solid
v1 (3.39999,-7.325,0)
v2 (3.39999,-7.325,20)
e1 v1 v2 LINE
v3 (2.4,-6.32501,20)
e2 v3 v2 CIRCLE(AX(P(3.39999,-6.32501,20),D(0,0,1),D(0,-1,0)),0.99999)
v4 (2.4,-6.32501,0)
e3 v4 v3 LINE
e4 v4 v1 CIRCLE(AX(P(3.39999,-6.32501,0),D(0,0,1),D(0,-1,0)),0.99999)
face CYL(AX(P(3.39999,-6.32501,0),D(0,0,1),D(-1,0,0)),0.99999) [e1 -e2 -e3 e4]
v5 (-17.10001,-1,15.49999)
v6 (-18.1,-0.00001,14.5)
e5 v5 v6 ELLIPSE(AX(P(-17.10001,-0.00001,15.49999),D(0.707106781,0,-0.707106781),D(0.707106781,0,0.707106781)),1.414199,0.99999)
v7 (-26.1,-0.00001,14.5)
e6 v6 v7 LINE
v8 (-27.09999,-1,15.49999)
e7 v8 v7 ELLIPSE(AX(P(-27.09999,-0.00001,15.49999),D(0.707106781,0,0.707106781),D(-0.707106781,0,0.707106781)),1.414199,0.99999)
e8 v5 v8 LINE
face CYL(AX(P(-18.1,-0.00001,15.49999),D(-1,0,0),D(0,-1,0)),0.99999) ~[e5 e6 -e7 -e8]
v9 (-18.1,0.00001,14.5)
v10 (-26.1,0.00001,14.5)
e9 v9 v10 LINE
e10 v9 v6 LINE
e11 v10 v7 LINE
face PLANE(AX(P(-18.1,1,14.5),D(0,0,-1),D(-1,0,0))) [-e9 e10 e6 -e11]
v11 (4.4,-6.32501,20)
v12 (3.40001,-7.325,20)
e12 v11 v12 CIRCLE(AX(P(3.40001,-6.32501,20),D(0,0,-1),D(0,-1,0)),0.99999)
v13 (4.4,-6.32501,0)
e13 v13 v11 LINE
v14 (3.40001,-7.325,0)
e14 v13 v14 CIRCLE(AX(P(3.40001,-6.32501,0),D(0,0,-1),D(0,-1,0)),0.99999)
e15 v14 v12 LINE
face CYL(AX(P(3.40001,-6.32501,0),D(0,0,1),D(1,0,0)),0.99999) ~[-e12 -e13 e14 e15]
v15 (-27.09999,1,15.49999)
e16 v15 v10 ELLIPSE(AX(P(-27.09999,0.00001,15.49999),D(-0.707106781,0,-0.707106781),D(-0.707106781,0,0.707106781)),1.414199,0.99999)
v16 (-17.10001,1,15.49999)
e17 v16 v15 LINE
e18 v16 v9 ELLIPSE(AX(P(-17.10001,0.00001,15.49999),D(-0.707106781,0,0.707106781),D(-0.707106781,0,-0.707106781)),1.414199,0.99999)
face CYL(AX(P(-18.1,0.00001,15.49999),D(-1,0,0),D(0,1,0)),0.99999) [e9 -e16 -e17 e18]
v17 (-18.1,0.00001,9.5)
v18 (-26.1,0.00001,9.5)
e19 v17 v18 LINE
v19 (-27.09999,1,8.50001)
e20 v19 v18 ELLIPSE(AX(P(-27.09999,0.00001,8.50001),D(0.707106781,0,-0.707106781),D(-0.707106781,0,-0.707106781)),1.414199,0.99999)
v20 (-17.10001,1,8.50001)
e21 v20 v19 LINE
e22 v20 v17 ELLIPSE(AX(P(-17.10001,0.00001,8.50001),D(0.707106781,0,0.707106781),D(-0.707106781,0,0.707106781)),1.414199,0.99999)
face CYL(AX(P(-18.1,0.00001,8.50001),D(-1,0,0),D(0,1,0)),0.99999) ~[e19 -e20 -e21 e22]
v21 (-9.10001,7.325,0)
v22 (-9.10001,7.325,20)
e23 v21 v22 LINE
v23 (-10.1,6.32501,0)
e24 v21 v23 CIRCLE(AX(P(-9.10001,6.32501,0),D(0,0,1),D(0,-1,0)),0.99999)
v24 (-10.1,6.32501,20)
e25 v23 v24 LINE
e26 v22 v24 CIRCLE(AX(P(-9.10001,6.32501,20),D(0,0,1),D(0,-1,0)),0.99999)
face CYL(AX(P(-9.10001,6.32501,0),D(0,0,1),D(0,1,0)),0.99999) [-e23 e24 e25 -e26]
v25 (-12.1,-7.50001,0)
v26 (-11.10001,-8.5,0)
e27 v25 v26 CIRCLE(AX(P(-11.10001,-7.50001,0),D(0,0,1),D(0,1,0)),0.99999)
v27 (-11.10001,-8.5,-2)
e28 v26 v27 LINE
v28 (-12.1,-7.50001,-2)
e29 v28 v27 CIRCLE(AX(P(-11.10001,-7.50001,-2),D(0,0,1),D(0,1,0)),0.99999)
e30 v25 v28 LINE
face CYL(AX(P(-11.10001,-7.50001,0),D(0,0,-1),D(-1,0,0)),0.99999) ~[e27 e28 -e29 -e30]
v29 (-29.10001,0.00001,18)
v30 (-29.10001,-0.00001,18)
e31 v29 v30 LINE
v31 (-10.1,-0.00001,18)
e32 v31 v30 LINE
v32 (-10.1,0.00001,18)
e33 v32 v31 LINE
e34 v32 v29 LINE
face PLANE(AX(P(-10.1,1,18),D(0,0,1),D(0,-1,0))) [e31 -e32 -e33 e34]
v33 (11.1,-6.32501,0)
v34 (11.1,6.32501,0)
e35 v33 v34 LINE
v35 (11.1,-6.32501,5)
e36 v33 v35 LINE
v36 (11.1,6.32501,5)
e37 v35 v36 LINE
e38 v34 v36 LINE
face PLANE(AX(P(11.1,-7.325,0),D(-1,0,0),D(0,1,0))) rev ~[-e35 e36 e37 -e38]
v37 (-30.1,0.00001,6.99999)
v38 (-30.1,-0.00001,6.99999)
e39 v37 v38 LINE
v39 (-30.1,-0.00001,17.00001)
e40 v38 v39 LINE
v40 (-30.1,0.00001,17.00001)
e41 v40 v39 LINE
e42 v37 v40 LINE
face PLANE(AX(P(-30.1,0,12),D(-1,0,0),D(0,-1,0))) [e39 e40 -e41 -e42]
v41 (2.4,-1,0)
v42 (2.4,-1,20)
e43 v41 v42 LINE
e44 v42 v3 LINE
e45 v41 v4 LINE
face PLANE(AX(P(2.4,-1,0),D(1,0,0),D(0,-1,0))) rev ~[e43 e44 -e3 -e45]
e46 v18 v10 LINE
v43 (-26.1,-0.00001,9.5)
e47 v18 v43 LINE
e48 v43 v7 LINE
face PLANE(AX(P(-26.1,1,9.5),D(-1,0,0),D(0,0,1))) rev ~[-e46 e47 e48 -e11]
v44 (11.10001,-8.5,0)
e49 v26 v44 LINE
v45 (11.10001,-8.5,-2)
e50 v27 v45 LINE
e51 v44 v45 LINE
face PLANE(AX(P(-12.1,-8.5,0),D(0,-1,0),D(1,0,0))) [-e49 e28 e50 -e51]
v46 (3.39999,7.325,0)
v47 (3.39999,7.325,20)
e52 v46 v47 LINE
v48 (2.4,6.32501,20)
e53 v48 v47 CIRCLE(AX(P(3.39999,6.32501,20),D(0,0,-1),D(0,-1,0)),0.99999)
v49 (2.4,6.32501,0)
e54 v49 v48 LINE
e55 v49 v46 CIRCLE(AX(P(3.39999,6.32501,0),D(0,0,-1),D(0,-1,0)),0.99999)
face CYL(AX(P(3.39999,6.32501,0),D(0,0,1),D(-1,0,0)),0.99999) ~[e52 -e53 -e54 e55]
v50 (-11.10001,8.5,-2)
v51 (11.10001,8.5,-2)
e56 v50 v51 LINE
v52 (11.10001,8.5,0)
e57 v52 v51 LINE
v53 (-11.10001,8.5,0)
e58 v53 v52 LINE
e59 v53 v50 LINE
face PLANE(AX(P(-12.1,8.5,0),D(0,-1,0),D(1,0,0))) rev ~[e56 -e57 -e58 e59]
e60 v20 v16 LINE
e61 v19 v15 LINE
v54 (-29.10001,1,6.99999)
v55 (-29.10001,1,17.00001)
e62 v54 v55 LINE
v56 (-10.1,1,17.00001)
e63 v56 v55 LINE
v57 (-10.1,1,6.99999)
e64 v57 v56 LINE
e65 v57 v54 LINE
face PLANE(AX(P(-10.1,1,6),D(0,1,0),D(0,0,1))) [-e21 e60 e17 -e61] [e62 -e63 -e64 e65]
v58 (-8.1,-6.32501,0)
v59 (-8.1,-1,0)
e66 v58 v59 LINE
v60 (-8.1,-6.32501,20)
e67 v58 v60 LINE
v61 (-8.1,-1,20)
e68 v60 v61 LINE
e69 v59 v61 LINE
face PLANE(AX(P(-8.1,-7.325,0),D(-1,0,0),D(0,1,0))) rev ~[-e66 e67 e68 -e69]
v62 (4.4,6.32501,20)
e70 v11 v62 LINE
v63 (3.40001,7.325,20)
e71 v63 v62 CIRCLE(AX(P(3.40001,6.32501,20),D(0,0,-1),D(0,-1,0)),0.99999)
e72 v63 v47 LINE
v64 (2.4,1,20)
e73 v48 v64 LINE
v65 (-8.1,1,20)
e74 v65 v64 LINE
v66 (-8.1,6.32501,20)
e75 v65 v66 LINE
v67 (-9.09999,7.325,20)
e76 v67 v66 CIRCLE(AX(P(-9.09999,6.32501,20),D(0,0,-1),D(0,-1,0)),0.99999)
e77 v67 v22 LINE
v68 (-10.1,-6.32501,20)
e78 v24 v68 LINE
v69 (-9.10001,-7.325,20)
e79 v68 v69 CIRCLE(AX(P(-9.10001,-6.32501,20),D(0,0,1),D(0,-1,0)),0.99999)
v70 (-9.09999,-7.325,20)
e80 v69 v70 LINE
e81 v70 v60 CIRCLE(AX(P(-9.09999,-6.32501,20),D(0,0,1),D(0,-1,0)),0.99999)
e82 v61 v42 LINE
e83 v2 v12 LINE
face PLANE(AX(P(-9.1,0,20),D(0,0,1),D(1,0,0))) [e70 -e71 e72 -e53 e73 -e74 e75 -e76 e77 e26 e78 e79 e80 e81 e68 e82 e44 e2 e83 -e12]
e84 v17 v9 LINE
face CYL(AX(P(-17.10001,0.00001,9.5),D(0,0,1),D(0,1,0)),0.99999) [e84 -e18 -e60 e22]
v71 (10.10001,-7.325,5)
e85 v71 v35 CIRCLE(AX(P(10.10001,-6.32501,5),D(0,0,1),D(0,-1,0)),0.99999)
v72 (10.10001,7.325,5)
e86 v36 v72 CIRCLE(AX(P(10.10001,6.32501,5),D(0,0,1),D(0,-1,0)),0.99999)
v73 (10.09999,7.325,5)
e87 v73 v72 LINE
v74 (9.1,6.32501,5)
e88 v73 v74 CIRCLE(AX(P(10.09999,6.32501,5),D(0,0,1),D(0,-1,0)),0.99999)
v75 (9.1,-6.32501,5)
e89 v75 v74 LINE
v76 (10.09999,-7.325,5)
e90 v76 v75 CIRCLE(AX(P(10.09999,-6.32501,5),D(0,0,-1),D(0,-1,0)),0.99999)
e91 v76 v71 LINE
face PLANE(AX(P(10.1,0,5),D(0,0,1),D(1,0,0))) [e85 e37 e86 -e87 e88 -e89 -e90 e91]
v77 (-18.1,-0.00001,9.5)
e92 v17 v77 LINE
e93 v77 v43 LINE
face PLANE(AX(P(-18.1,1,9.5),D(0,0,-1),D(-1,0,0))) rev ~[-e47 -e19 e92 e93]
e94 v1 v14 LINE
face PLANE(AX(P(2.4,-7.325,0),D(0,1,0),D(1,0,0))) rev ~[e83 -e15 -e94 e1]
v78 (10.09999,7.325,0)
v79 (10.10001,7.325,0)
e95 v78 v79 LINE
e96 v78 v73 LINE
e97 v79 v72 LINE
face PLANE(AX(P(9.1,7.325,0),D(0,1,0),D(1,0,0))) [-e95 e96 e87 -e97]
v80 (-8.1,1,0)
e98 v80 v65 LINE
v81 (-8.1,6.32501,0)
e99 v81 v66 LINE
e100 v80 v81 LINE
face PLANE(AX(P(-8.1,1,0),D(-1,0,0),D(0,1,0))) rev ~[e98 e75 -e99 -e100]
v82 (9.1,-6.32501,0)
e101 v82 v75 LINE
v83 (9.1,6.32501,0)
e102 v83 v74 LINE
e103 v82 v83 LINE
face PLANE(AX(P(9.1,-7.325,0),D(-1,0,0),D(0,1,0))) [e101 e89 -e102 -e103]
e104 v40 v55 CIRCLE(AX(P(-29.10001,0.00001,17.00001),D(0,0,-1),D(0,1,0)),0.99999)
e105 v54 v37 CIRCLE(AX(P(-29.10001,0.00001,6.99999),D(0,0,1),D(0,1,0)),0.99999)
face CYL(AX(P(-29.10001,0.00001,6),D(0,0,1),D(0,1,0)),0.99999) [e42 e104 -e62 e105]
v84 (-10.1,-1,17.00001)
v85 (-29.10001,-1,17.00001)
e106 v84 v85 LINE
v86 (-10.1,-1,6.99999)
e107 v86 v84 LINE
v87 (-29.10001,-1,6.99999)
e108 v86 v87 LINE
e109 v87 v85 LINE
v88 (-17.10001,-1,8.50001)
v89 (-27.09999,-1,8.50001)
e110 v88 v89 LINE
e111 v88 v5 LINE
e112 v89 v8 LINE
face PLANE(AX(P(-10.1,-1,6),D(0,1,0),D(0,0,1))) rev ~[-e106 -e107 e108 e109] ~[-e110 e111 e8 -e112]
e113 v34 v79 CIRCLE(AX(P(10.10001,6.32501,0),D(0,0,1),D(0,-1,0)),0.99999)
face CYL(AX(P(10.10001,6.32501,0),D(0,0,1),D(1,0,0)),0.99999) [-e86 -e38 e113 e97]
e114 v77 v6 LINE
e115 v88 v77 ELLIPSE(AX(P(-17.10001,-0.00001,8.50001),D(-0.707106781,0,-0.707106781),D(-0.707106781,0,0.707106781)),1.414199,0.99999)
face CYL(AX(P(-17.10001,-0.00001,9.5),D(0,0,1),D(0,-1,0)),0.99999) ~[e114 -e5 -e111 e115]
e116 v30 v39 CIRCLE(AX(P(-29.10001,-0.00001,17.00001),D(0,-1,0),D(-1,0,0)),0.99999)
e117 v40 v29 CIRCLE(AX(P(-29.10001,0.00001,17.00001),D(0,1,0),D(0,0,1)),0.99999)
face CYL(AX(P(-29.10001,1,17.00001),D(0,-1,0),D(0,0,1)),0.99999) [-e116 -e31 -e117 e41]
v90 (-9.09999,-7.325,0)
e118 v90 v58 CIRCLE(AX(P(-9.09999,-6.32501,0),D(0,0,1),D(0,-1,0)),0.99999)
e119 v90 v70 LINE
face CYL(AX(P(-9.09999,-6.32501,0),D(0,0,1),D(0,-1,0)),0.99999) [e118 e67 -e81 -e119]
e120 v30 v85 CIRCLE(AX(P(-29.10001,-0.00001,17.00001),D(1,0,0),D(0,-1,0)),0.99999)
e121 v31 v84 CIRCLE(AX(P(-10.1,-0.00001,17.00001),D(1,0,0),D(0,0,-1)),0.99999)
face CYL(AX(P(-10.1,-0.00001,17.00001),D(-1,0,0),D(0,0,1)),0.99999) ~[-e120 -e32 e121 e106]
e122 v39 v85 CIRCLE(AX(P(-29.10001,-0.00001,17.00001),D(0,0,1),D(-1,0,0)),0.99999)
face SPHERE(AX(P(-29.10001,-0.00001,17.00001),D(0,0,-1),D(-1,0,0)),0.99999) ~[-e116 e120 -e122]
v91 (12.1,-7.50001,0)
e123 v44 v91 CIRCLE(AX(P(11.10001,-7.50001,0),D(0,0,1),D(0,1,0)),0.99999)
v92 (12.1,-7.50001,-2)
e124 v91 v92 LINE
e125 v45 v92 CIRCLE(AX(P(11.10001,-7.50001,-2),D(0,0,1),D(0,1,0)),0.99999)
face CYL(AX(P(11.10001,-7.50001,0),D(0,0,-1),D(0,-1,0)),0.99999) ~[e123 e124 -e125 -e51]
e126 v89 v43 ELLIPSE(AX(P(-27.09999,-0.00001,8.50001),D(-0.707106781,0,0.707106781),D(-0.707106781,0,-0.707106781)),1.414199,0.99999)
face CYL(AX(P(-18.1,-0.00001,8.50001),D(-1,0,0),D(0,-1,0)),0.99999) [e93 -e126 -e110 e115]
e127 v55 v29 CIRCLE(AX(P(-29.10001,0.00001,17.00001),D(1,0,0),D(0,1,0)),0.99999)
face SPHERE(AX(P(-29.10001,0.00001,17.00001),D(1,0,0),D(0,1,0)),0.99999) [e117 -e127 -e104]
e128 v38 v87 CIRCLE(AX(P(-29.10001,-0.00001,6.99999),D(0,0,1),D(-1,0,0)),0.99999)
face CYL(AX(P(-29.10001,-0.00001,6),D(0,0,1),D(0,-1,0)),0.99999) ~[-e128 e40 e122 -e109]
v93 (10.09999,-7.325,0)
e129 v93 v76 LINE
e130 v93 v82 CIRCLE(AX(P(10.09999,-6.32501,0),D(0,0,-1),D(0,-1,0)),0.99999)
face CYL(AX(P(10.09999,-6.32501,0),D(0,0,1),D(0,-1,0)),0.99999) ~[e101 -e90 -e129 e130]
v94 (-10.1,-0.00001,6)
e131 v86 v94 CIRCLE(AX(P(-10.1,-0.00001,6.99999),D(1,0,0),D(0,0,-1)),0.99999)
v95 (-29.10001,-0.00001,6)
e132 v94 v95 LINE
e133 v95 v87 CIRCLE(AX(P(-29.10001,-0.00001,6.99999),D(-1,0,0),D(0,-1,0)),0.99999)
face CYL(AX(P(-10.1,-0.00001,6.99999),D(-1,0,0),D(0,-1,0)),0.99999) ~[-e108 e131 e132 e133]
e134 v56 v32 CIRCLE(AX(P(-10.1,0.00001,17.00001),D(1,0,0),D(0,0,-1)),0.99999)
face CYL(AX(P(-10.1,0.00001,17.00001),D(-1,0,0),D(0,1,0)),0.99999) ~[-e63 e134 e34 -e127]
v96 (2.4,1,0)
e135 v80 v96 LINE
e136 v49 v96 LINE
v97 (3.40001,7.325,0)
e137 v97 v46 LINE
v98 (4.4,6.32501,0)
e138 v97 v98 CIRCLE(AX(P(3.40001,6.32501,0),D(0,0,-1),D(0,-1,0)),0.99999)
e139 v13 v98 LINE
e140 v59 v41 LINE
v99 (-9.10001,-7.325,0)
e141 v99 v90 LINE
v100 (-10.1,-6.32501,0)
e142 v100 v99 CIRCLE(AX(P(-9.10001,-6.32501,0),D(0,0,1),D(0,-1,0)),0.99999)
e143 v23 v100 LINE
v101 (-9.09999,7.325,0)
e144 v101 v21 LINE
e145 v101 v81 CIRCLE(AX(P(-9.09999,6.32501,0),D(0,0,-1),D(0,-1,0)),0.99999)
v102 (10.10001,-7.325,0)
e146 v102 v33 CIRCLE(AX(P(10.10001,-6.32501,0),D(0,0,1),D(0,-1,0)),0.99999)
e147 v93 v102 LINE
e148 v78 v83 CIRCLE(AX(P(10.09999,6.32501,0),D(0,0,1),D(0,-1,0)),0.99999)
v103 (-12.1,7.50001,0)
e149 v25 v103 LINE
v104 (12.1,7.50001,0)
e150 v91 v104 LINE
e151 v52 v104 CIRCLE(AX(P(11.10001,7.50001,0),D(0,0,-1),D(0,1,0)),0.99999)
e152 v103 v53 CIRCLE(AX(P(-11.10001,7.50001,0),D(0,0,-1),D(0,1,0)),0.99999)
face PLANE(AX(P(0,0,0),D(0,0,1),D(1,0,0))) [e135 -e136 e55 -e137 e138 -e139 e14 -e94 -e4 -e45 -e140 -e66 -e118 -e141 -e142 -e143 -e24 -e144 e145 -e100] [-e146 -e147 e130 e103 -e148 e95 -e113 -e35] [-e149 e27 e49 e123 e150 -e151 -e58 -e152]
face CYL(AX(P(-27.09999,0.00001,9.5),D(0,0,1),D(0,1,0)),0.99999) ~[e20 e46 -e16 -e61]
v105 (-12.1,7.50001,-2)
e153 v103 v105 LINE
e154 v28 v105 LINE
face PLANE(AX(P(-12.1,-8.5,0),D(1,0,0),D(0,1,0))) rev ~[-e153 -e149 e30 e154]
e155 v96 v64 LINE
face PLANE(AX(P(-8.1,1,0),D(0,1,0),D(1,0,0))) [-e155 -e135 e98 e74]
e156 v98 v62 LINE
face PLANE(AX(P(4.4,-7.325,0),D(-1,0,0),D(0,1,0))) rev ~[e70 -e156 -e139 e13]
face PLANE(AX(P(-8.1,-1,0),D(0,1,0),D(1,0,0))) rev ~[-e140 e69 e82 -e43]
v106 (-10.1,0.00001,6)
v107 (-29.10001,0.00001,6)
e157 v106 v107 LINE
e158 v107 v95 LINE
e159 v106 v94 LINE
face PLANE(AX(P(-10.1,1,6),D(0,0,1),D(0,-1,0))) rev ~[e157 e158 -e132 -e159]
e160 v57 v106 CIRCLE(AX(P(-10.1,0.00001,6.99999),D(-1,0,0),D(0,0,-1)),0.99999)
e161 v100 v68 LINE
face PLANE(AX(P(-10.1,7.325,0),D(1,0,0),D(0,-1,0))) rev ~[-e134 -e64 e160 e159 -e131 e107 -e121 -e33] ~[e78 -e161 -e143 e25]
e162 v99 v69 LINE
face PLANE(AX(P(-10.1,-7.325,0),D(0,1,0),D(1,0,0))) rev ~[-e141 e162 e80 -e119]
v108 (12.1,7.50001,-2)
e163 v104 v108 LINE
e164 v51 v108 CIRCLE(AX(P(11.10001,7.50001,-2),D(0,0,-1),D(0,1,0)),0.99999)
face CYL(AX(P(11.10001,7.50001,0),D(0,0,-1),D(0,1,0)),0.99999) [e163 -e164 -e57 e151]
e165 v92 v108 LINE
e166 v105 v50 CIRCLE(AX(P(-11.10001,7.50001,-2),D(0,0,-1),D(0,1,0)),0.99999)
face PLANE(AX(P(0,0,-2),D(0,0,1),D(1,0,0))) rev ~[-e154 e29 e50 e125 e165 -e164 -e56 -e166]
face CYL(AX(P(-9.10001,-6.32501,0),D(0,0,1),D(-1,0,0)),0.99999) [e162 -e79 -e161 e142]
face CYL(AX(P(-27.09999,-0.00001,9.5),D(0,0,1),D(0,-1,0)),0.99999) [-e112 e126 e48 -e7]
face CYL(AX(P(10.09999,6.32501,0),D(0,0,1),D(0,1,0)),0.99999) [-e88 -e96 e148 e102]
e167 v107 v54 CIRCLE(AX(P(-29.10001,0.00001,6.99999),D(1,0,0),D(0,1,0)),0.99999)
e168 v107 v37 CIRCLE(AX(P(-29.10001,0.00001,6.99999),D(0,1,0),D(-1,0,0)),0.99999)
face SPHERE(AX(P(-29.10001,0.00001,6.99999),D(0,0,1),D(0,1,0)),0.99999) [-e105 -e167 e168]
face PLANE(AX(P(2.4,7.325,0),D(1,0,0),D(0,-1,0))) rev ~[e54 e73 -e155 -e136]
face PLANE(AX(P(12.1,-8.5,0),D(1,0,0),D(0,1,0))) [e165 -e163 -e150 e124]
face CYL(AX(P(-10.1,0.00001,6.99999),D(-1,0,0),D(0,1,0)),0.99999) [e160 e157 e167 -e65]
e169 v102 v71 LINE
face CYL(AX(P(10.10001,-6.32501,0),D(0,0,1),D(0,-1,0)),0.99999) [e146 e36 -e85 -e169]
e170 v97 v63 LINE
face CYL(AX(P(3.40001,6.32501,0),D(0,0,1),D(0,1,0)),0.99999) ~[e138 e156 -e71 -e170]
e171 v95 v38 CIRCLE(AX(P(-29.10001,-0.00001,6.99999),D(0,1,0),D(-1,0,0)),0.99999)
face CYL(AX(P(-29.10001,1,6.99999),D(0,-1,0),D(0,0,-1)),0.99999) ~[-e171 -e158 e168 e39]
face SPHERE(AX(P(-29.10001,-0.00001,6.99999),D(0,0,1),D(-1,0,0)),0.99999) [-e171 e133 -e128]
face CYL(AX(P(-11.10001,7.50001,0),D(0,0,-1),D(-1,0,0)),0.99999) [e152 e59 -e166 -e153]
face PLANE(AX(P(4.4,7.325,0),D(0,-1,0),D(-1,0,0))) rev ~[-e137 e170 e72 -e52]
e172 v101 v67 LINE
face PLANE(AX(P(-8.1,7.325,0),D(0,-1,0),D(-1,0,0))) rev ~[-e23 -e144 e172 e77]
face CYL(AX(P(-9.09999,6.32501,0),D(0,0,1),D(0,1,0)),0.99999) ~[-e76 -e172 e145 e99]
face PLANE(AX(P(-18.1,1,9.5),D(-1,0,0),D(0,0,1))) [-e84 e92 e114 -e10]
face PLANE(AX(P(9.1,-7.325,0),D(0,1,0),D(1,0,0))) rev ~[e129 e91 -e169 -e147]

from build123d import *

# Parameters (mm, degrees)
F0_W     = 24.2
F0_H     = 17
F0_W_2   = 2
F0_H_2   = 14.65
F0_W_3   = 10.5
F0_H_3   = 1
F1_DEPTH = 2
F2_DEPTH = 20
F3_DEPTH = 5
F4_W     = 2
F4_H     = 12
F5_DEPTH = 20
F6_W     = 8
F6_H     = 5
F7_DEPTH = 25
F8_R     = 0.99999


# Not quite as in the source:
# - a fillet or chamfer is up to 0.001 mm smaller than in the source, because OpenCascade refuses the exact size


with BuildPart() as f1:
    # F0 (on Top) → F1 (new body)
    with BuildSketch(Plane.XY):
        Rectangle(F0_W, F0_H)
        Polygon((-10.1, 7.325), (-8.1, 7.325), (-8.1, 1), (2.4, 1), (2.4, 7.325), (4.4, 7.325), (4.4, -7.325), (2.4, -7.325), (2.4, -1), (-8.1, -1), (-8.1, -7.325), (-10.1, -7.325), align=None, mode=Mode.SUBTRACT)
        with Locations((10.1, 0)):
            Rectangle(F0_W_2, F0_H_2, mode=Mode.SUBTRACT)
        Polygon((-8.1, 1), (-8.1, 7.325), (-10.1, 7.325), (-10.1, -7.325), (-8.1, -7.325), (-8.1, -1), (-8.1, 0), align=None)
        Polygon((2.4, 7.325), (2.4, 1), (2.4, 0), (2.4, -1), (2.4, -7.325), (4.4, -7.325), (4.4, 7.325), align=None)
        with Locations((10.1, 0)):
            Rectangle(F0_W_2, F0_H_2)
        with Locations((-2.85, -0.5)):
            Rectangle(F0_W_3, F0_H_3)
        with Locations((-2.85, 0.5)):
            Rectangle(F0_W_3, F0_H_3)
    extrude(amount=-F1_DEPTH)

    # F0 (on Top) → F2 (join)
    with BuildSketch(Plane.XY):
        Polygon((-8.1, 1), (-8.1, 7.325), (-10.1, 7.325), (-10.1, -7.325), (-8.1, -7.325), (-8.1, -1), (-8.1, 0), align=None)
        with Locations((-2.85, 0.5)):
            Rectangle(F0_W_3, F0_H_3)
        Polygon((2.4, 7.325), (2.4, 1), (2.4, 0), (2.4, -1), (2.4, -7.325), (4.4, -7.325), (4.4, 7.325), align=None)
        with Locations((-2.85, -0.5)):
            Rectangle(F0_W_3, F0_H_3)
    extrude(amount=F2_DEPTH)

    # F0 (on Top) → F3 (join)
    with BuildSketch(Plane.XY):
        with Locations((10.1, 0)):
            Rectangle(F0_W_2, F0_H_2)
    extrude(amount=F3_DEPTH)

    # F4 (on face) → F5 (join)
    with BuildSketch(Plane(origin=(-10.1, 0, 0), x_dir=(0, -1, 0), z_dir=(-1, 0, 0))):
        with Locations((0, 12)):
            Rectangle(F4_W, F4_H)
    extrude(amount=F5_DEPTH)

    # F6 (on face) → F7 (cut)
    with BuildSketch(Plane(origin=(0, 1, 0), x_dir=(-1, 0, 0), z_dir=(0, 1, 0))):
        with Locations((22.1, 12)):
            Rectangle(F6_W, F6_H)
    extrude(amount=-F7_DEPTH, mode=Mode.SUBTRACT)

    # F8 (radius 1 in the source; OpenCascade refuses exactly that, so slightly less here)
    f8_edges = [f1.edges().sort_by_distance(p)[0] for p in [
        (-12.1, -8.5, -1),
        (-12.1, 8.5, -1),
        (12.1, -8.5, -1),
        (12.1, 8.5, -1),
        (11.1, -7.325, 2.5),
        (9.1, -7.325, 2.5),
        (11.1, 7.325, 2.5),
        (9.1, 7.325, 2.5),
        (2.4, -7.325, 10),
        (4.4, -7.325, 10),
        (-8.1, -7.325, 10),
        (-10.1, -7.325, 10),
        (-10.1, 7.325, 10),
        (-8.1, 7.325, 10),
        (2.4, 7.325, 10),
        (4.4, 7.325, 10),
        (-20.1, 1, 18),
        (-30.1, 1, 12),
        (-30.1, -1, 12),
        (-20.1, 1, 6),
        (-30.1, 0, 6),
        (-30.1, 0, 18),
        (-20.1, -1, 18),
        (-20.1, -1, 6),
        (-22.1, 1, 14.5),
        (-18.1, 1, 12),
        (-22.1, 1, 9.5),
        (-26.1, 1, 12),
        (-18.1, -1, 12),
        (-22.1, -1, 9.5),
        (-22.1, -1, 14.5),
        (-26.1, -1, 12),
    ]]
    fillet(f8_edges, radius=F8_R)


solid = f1.part
